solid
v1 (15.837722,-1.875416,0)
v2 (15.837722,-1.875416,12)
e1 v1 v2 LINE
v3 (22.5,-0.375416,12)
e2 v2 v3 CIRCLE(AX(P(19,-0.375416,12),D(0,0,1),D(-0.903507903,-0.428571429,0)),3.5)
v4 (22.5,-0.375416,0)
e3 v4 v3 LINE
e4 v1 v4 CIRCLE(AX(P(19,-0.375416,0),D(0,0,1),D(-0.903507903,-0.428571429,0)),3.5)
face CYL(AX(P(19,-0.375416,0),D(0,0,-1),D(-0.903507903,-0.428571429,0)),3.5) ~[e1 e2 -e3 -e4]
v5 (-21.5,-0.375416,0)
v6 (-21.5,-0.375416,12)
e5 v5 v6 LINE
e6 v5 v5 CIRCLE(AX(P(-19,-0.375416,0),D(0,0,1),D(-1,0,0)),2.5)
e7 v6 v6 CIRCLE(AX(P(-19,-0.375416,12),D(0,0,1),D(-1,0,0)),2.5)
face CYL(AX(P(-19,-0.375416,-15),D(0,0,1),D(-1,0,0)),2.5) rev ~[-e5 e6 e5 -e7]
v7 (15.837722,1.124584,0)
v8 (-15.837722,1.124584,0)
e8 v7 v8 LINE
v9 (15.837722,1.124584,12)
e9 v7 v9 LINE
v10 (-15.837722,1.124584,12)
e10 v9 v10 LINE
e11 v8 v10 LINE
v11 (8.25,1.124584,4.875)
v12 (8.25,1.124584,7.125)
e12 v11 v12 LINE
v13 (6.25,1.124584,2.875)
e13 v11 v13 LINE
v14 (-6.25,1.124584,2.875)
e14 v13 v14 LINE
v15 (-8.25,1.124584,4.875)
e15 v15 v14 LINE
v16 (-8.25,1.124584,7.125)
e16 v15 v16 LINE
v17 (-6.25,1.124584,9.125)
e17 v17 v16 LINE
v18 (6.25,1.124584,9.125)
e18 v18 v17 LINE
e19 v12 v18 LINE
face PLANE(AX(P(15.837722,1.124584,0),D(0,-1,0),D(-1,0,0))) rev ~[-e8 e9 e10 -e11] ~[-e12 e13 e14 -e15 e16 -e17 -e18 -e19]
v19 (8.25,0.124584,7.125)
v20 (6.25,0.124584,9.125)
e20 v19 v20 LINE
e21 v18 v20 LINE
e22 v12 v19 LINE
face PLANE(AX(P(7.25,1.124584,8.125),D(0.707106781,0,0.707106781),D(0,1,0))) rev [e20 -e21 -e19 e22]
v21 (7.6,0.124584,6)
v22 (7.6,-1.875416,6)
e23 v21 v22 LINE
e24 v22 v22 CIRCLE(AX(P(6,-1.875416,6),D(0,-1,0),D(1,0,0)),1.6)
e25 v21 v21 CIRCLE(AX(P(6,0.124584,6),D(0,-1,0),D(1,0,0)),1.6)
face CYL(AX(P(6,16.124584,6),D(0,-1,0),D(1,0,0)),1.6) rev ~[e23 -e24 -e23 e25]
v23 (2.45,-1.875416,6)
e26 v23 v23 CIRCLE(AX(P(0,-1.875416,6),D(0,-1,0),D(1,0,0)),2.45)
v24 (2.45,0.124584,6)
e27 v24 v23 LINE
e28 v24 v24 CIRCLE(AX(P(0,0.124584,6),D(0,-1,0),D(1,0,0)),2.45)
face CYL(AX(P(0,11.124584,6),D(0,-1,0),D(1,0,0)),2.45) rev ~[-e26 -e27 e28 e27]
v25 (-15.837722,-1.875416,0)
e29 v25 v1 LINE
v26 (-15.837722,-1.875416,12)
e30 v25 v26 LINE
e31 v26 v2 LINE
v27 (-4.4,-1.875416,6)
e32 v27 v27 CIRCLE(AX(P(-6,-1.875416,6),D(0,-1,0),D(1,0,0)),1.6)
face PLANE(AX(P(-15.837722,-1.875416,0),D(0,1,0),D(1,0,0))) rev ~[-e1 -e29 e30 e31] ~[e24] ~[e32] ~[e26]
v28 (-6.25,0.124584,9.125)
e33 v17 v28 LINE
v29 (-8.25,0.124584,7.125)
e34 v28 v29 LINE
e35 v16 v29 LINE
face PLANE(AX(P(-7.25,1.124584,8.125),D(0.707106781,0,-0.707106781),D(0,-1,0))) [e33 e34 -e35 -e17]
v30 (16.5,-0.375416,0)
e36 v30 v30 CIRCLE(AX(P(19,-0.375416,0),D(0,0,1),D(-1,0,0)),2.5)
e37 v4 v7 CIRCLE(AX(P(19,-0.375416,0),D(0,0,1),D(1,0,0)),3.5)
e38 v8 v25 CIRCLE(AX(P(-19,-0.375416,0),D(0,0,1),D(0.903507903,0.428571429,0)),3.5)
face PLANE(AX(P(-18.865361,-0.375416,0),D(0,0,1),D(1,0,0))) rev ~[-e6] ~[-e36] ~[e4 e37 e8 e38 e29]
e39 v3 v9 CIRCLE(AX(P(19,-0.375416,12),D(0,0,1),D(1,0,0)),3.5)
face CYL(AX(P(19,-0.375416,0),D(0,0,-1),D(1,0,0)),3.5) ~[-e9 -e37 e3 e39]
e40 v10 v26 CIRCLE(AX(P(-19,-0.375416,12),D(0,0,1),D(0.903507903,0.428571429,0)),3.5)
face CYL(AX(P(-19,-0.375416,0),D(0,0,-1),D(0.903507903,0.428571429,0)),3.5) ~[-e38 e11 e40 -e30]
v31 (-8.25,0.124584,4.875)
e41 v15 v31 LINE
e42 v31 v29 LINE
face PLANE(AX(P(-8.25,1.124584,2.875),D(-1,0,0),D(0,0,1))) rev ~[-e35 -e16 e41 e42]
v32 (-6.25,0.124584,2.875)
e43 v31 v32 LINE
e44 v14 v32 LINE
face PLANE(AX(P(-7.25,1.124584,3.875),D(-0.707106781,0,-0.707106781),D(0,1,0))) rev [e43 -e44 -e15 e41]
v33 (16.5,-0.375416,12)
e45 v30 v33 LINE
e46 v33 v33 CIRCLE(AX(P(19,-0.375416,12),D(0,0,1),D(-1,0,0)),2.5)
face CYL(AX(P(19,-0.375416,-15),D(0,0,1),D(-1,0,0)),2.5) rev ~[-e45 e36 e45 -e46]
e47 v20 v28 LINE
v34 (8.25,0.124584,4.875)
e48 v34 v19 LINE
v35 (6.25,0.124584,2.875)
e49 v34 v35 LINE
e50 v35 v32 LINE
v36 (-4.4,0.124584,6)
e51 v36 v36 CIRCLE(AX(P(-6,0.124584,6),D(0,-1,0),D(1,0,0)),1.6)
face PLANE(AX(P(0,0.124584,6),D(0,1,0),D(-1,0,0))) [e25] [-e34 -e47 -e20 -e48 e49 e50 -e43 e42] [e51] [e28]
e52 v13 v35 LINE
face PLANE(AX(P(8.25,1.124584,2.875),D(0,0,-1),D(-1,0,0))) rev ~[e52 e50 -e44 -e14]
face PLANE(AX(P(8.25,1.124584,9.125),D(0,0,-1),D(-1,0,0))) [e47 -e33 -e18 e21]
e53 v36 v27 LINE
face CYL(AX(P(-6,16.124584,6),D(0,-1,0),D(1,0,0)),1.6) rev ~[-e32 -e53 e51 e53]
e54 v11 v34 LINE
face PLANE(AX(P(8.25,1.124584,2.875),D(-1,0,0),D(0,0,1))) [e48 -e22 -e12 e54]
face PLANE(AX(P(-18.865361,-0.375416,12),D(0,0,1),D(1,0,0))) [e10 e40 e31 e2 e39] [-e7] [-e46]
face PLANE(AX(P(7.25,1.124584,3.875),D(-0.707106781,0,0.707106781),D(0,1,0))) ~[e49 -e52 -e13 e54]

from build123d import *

# Parameters (mm, degrees)
F1_DEPTH = 12
F2_D     = 5
F2_DEPTH = 15
F2_TIP   = 1.5021515476
F3_D     = 5
F3_DEPTH = 15
F3_TIP   = 1.5021515476
F5_D     = 4.9
F5_DEPTH = 10
F5_TIP   = 1.4721085166
F6_D     = 3.2
F6_DEPTH = 15
F6_TIP   = 0.9613769904
F7_D     = 3.2
F7_DEPTH = 15
F7_TIP   = 0.9613769904
F8_W     = 16.5
F8_H     = 6.25
F9_DEPTH = 1
F10_SIZE = 2


# Not quite as in the source:
# - a feature names something its author has since deleted; it is built from what else it names


with BuildPart() as f1:
    # F0 (on Top) → F1 (new body)
    with BuildSketch(Plane.XY):
        with BuildLine():
            Line((-19, -1.8754155822), (-19, 1.1245844178))
            Line((-19, 1.1245844178), (-15.8377223398, 1.1245844178))
            ThreePointArc((-15.8377223398, 1.1245844178), (-22.5, -0.3754155822), (-15.8377223398, -1.8754155822))
            Line((-15.8377223398, -1.8754155822), (-19, -1.8754155822))
        make_face()
        with BuildLine():
            Line((-15.8377223398, 1.1245844178), (-19, 1.1245844178))
            Line((-19, 1.1245844178), (-19, -1.8754155822))
            Line((-19, -1.8754155822), (-15.8377223398, -1.8754155822))
            ThreePointArc((-15.8377223398, -1.8754155822), (-15.5854742781, -1.144189993), (-15.5, -0.3754155822))
            ThreePointArc((-15.5, -0.3754155822), (-15.5854742781, 0.3933588286), (-15.8377223398, 1.1245844178))
        make_face()
        with BuildLine():
            Line((15.8377223398, 1.1245844178), (-15.8377223398, 1.1245844178))
            ThreePointArc((-15.8377223398, 1.1245844178), (-15.5854742781, 0.3933588286), (-15.5, -0.3754155822))
            ThreePointArc((-15.5, -0.3754155822), (-15.5854742781, -1.144189993), (-15.8377223398, -1.8754155822))
            Line((-15.8377223398, -1.8754155822), (15.8377223398, -1.8754155822))
            ThreePointArc((15.8377223398, -1.8754155822), (15.5, -0.3754155822), (15.8377223398, 1.1245844178))
        make_face()
        with BuildLine():
            ThreePointArc((22.5, -0.3754155822), (19.7687744108, 3.0391101397), (15.8377223398, 1.1245844178))
            Line((15.8377223398, 1.1245844178), (19, 1.1245844178))
            Line((19, 1.1245844178), (19, -1.8754155822))
            Line((19, -1.8754155822), (15.8377223398, -1.8754155822))
            ThreePointArc((15.8377223398, -1.8754155822), (19.7687744108, -3.7899413041), (22.5, -0.3754155822))
        make_face()
        with BuildLine():
            Line((19, 1.1245844178), (15.8377223398, 1.1245844178))
            ThreePointArc((15.8377223398, 1.1245844178), (15.5, -0.3754155822), (15.8377223398, -1.8754155822))
            Line((15.8377223398, -1.8754155822), (19, -1.8754155822))
            Line((19, -1.8754155822), (19, 1.1245844178))
        make_face()
    extrude(amount=F1_DEPTH)

    # F2
    with Locations(Plane(origin=(0, 0, 0), x_dir=(1, 0, 0), z_dir=(0, 0, -1))):
        with Locations((19, 0.3754155822)):
            Hole(F2_D / 2, depth=F2_DEPTH)
            with Locations((0, 0, -(F2_DEPTH + F2_TIP / 2))):  # 118° drill point
                Cone(0, F2_D / 2, F2_TIP, mode=Mode.SUBTRACT)

    # F3
    with Locations(Plane(origin=(0, 0, 0), x_dir=(1, 0, 0), z_dir=(0, 0, -1))):
        with Locations((-19, 0.3754155822)):
            Hole(F3_D / 2, depth=F3_DEPTH)
            with Locations((0, 0, -(F3_DEPTH + F3_TIP / 2))):  # 118° drill point
                Cone(0, F3_D / 2, F3_TIP, mode=Mode.SUBTRACT)

    # F5
    with Locations(Plane(origin=(0, 1.1245844178, 0), x_dir=(-1, 0, 0), z_dir=(0, 1, 0))):
        with Locations((0, 6)):
            Hole(F5_D / 2, depth=F5_DEPTH)
            with Locations((0, 0, -(F5_DEPTH + F5_TIP / 2))):  # 118° drill point
                Cone(0, F5_D / 2, F5_TIP, mode=Mode.SUBTRACT)

    # F6
    with Locations(Plane(origin=(0, 1.1245844178, 0), x_dir=(-1, 0, 0), z_dir=(0, 1, 0))):
        with Locations((-6, 6)):
            Hole(F6_D / 2, depth=F6_DEPTH)
            with Locations((0, 0, -(F6_DEPTH + F6_TIP / 2))):  # 118° drill point
                Cone(0, F6_D / 2, F6_TIP, mode=Mode.SUBTRACT)

    # F7
    with Locations(Plane(origin=(0, 1.1245844178, 0), x_dir=(-1, 0, 0), z_dir=(0, 1, 0))):
        with Locations((6, 6)):
            Hole(F7_D / 2, depth=F7_DEPTH)
            with Locations((0, 0, -(F7_DEPTH + F7_TIP / 2))):  # 118° drill point
                Cone(0, F7_D / 2, F7_TIP, mode=Mode.SUBTRACT)

    # F8 (on face) → F9 (cut)
    with BuildSketch(Plane(origin=(0, 1.1245844178, 0), x_dir=(-1, 0, 0), z_dir=(0, 1, 0))):
        with Locations((0, 6)):
            Rectangle(F8_W, F8_H)
    extrude(amount=-F9_DEPTH, mode=Mode.SUBTRACT)

    # F10
    f10_edges = [f1.edges().sort_by_distance(p)[0] for p in [
        (8.25, 0.624584, 9.125),
        (8.25, 0.624584, 2.875),
        (-8.25, 0.624584, 9.125),
        (-8.25, 0.624584, 2.875),
    ]]
    chamfer(f10_edges, length=F10_SIZE)


solid = f1.part
